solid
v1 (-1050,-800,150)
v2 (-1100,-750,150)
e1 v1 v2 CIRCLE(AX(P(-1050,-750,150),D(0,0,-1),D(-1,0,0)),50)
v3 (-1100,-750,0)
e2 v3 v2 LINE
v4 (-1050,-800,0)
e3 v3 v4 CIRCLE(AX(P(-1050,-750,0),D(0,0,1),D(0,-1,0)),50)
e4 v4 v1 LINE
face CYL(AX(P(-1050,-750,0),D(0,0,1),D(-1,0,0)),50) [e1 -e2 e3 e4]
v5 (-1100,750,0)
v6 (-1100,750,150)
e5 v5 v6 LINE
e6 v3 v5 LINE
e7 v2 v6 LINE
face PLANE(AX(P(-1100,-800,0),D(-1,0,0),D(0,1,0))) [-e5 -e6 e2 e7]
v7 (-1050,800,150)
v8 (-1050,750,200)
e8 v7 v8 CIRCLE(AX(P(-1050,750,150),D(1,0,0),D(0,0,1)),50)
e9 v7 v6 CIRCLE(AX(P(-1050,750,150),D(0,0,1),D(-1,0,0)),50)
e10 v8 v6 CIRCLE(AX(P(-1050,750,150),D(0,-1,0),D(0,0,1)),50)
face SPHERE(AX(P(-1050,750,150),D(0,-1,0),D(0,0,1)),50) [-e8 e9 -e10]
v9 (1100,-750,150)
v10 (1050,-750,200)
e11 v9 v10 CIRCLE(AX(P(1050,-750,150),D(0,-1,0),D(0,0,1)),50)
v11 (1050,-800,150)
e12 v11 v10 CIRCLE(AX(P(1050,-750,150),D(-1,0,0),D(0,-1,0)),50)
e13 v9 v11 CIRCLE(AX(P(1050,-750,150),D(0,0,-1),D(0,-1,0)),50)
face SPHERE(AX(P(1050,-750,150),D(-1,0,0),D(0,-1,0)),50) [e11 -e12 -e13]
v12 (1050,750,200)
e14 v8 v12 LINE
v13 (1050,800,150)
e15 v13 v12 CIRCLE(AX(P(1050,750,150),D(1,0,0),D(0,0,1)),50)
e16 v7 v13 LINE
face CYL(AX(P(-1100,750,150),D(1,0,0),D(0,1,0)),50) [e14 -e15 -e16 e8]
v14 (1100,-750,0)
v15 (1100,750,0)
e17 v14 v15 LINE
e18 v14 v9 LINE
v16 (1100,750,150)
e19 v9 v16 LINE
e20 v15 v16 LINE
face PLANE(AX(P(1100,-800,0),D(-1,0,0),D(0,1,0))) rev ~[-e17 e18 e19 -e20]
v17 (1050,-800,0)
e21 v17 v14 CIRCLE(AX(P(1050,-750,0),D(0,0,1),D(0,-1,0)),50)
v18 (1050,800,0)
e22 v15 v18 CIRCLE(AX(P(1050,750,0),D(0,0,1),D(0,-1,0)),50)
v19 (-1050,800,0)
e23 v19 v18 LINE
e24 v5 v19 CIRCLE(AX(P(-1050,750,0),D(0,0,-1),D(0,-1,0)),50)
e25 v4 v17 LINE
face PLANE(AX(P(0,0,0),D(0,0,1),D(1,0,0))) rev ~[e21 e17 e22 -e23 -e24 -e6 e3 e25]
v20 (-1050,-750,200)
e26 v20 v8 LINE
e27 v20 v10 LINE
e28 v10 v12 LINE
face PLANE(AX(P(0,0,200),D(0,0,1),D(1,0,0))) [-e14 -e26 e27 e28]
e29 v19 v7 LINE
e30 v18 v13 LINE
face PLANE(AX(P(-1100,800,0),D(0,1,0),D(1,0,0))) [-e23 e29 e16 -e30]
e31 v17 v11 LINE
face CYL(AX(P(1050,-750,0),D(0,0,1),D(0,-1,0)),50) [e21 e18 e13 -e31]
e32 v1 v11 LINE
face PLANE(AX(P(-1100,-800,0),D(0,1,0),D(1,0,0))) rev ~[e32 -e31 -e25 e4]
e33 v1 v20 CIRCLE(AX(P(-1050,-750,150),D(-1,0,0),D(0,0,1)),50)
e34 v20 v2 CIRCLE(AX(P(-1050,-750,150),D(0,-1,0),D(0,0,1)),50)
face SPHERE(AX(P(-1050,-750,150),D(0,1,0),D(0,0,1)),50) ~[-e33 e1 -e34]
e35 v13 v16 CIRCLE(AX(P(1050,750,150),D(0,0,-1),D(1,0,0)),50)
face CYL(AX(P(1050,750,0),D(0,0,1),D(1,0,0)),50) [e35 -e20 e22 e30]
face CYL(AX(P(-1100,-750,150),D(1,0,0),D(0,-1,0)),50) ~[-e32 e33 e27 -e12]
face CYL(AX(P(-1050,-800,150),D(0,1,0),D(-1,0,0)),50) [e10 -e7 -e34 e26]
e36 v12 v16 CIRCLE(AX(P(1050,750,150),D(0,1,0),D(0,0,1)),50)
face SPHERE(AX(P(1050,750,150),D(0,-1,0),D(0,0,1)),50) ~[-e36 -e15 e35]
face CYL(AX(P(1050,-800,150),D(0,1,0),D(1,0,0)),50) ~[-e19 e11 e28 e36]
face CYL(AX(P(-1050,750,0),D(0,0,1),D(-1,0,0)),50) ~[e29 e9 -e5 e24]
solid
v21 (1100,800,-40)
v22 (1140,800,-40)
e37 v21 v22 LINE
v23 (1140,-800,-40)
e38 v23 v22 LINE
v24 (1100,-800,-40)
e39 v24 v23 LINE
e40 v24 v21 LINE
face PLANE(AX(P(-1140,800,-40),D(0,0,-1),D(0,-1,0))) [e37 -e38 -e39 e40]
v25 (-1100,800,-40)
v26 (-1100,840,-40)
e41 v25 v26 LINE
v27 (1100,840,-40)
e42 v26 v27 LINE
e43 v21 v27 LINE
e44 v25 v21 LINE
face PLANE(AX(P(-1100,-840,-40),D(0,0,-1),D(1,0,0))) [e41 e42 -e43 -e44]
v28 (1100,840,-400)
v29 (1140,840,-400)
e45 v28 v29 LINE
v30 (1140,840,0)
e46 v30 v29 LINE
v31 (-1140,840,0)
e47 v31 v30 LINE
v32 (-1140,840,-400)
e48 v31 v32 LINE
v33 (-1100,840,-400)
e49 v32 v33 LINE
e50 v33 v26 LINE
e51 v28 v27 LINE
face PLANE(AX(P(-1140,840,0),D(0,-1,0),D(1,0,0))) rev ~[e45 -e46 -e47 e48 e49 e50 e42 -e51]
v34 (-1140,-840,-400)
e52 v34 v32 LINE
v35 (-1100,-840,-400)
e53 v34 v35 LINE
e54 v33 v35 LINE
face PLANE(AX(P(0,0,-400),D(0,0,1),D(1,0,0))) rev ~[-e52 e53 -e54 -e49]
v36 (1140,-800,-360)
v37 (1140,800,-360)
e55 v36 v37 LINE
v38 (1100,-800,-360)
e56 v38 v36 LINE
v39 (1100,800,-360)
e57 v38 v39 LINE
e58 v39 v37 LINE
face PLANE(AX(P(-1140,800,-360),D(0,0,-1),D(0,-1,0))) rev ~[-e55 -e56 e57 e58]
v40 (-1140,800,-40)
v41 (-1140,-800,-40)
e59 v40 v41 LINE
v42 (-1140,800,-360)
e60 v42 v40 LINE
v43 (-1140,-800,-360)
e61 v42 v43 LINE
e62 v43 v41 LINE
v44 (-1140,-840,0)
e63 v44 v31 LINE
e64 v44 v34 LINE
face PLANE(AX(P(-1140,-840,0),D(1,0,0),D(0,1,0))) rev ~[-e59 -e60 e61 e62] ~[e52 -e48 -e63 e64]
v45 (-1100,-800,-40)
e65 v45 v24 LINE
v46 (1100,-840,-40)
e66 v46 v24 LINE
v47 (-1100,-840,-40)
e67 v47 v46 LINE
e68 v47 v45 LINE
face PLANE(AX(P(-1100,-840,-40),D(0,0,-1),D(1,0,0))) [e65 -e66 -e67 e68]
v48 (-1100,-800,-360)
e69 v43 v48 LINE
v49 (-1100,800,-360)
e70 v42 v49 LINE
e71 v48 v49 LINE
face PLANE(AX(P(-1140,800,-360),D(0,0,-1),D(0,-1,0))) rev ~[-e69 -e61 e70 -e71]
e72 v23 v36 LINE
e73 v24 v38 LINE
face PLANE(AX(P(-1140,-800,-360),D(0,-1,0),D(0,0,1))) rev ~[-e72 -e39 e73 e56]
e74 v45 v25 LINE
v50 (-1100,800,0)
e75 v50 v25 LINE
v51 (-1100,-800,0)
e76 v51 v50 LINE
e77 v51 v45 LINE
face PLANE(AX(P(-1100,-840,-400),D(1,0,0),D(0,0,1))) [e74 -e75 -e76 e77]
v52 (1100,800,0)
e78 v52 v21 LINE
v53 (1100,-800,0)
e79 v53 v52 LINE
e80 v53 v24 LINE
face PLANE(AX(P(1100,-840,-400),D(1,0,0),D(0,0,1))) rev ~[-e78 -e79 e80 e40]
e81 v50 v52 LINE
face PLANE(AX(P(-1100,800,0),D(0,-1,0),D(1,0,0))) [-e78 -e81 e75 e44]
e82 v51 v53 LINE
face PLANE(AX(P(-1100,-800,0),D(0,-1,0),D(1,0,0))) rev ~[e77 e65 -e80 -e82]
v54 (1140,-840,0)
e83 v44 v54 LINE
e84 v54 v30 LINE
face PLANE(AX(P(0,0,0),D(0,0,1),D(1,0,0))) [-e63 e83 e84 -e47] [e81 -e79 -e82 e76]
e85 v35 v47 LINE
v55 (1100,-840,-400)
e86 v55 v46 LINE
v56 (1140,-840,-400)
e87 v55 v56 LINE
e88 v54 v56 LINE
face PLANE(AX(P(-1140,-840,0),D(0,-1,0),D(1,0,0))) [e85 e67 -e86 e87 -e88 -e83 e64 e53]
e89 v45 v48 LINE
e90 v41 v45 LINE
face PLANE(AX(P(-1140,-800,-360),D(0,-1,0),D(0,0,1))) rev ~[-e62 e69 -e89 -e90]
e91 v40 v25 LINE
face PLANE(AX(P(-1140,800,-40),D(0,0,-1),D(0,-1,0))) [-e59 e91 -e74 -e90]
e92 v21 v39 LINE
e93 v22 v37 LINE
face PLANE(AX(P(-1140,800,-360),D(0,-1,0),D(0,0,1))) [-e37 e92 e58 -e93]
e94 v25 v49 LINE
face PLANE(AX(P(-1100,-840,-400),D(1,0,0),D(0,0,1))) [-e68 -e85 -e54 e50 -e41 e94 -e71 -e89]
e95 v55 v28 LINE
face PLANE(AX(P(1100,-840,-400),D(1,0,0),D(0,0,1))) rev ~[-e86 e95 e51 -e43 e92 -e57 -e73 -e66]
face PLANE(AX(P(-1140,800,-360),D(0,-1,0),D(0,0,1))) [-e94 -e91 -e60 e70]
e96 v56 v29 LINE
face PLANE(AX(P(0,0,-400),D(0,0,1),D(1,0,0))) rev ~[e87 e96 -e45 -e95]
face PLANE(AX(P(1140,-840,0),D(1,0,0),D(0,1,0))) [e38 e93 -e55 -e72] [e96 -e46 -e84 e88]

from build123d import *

# Parameters (mm, degrees)
F0_W     = 2280
F0_H     = 1680
F0_W_2   = 2200
F0_H_2   = 1600
F1_DEPTH = 400
F2_W     = 2200
F2_H     = 360
F3_DEPTH = 1680.001
F4_W     = 1600
F4_H     = 320
F5_DEPTH = 2280.001
F7_DEPTH = 200
F8_R     = 50


# Not quite as in the source:
# - the program builds the solid bodies; features that only make, move or delete a surface that nothing else refers to are left out


with BuildPart() as f1:
    # F0 (on Top) → F1 (new body)
    with BuildSketch(Plane.XY):
        Rectangle(F0_W, F0_H)
        Rectangle(F0_W_2, F0_H_2, mode=Mode.SUBTRACT)
    extrude(amount=-F1_DEPTH)

    # F2 (on face) → F3 (cut, through all)
    with BuildSketch(Plane.XZ.offset(840)):
        with Locations((0, -220)):
            Rectangle(F2_W, F2_H)
    extrude(amount=-F3_DEPTH, mode=Mode.SUBTRACT)

    # F4 (on face) → F5 (cut, through all)
    with BuildSketch(Plane(origin=(-1140, 0, 0), x_dir=(0, -1, 0), z_dir=(-1, 0, 0))):
        with Locations((0, -200)):
            Rectangle(F4_W, F4_H)
    extrude(amount=-F5_DEPTH, mode=Mode.SUBTRACT)


with BuildPart() as f7:
    # F0 (on Top) → F7 (new body)
    with BuildSketch(Plane.XY):
        Rectangle(F0_W_2, F0_H_2)
    extrude(amount=F7_DEPTH)

    # F8
    f8_edges = [f7.edges().sort_by_distance(p)[0] for p in [
        (-1100, 0, 200),
        (0, -800, 200),
        (-1100, -800, 100),
        (1100, -800, 100),
        (1100, 0, 200),
        (0, 800, 200),
        (1100, 800, 100),
        (-1100, 800, 100),
    ]]
    fillet(f8_edges, radius=F8_R)


solid = Compound([f1.part, f7.part])
